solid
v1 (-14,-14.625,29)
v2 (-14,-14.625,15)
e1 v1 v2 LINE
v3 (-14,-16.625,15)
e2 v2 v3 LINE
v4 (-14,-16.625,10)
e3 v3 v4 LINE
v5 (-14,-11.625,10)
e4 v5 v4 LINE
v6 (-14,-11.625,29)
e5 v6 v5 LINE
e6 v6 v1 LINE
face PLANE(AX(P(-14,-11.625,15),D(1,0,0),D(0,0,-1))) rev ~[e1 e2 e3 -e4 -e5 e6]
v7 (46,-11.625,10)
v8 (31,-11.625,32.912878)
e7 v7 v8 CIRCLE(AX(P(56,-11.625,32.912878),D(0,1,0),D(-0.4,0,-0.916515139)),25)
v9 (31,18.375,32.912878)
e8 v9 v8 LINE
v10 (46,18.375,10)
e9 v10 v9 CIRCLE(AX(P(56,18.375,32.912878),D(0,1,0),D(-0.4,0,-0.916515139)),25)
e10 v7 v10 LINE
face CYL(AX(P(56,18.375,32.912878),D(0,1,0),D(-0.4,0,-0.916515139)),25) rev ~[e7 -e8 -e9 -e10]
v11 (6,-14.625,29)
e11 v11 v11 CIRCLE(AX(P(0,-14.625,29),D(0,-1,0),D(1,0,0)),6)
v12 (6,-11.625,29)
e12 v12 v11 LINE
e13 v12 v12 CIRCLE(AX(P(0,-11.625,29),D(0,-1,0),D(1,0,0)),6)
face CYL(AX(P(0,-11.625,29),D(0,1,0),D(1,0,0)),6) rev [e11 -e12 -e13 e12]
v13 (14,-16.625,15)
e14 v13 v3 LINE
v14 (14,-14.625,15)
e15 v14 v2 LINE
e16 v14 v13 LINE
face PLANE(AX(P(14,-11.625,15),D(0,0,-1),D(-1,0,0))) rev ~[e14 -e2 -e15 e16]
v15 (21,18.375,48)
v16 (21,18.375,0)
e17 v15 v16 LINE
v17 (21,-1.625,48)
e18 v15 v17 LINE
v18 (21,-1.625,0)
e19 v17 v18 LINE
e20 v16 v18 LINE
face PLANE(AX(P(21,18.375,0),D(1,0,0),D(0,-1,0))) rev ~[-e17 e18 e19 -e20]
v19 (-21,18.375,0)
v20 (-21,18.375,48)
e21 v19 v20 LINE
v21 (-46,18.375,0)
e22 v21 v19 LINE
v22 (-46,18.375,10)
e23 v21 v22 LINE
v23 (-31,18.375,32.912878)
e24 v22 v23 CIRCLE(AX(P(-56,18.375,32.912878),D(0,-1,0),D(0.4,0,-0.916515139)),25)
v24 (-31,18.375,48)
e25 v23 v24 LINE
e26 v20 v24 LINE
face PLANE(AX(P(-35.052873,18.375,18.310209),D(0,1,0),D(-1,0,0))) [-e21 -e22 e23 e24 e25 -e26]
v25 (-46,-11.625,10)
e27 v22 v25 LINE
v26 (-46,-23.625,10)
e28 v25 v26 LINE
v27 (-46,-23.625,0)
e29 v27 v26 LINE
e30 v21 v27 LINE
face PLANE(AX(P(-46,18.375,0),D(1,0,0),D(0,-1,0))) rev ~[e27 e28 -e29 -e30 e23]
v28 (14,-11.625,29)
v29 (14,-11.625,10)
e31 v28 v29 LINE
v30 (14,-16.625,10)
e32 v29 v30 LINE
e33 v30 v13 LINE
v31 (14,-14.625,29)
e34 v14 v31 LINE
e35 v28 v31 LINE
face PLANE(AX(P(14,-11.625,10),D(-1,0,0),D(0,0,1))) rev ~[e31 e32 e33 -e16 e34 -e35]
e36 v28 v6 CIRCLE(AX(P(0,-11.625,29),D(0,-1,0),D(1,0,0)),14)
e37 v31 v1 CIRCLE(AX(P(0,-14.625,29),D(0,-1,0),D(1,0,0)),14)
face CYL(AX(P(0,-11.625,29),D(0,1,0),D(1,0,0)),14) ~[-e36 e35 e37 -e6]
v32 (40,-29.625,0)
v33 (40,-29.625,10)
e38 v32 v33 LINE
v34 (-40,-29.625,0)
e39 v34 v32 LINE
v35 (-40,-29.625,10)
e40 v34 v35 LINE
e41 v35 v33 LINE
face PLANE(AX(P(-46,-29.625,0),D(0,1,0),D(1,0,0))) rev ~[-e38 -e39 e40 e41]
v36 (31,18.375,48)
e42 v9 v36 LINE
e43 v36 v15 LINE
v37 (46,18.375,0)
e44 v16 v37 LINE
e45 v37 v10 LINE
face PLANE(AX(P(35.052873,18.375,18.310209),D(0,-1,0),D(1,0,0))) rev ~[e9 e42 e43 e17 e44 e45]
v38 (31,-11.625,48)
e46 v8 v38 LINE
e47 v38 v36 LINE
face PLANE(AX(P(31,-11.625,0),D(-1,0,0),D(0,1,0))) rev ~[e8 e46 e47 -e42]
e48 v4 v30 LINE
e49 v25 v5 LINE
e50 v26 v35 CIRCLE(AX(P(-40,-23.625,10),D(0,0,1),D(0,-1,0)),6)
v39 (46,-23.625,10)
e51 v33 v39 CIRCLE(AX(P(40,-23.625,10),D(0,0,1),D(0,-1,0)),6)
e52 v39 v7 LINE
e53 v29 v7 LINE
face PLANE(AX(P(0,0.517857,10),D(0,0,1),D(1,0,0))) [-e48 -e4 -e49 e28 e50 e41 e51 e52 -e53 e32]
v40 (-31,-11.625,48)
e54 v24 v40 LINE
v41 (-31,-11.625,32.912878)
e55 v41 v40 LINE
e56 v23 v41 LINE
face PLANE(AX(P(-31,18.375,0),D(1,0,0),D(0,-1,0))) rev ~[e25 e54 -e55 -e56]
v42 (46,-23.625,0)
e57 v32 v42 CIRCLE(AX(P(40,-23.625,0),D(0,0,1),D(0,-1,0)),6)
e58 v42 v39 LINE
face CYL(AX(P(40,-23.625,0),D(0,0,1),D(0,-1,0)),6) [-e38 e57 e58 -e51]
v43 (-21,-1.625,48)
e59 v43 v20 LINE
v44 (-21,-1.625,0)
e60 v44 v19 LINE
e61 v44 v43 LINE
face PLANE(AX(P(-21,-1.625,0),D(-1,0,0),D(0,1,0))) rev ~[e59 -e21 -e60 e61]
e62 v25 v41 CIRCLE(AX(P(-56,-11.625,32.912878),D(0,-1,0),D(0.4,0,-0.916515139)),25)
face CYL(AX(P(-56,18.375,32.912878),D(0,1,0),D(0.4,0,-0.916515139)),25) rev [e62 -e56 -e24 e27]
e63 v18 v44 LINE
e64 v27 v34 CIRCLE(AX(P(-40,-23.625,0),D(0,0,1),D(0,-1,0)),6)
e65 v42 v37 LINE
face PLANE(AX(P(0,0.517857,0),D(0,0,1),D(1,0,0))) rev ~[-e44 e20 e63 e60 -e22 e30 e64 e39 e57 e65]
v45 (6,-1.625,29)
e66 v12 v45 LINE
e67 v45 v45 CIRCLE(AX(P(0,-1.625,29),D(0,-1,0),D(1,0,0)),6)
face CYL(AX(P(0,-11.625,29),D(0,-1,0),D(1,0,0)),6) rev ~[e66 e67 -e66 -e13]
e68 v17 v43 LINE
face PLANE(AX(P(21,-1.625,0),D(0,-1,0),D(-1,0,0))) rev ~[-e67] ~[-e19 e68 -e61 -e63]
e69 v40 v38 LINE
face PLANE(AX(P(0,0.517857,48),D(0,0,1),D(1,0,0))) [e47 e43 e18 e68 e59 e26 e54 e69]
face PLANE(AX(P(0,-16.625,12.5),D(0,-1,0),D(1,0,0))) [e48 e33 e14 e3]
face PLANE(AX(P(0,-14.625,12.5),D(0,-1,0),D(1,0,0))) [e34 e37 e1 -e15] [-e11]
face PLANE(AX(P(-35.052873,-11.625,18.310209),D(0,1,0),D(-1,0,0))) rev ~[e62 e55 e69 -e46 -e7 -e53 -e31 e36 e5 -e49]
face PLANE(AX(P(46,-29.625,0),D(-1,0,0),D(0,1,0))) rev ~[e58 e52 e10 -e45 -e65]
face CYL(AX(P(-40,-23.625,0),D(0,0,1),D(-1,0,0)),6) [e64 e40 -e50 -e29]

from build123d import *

# Parameters (mm, degrees)
F1_DEPTH    = 48
F2_DEPTH    = 10
F3_R        = 6
F4_T1_DEPTH = 30
F5_T1_DEPTH = 30
F7_DEPTH    = 5
F6_R        = 6
F8_DEPTH    = 3
F9_DEPTH    = 25


# Not quite as in the source:
# - a fillet or chamfer that OpenCascade refuses, or shapes differently, is made with other operations: its cross-section is extruded or revolved along the edge and cut away or added


with BuildPart() as f1:
    # F0 (on Top) → F1 (new body)
    with BuildSketch(Plane.XY):
        Polygon((21, -1.625), (0, -1.625), (-21, -1.625), (-21, 18.375), (-31, 18.375), (-31, -11.625), (0, -11.625), (31, -11.625), (31, 18.375), (21, 18.375), align=None)
    extrude(amount=F1_DEPTH)

    # F0 (on Top) → F2 (join)
    with BuildSketch(Plane.XY):
        Polygon((21, -1.625), (0, -1.625), (-21, -1.625), (-21, 18.375), (-31, 18.375), (-31, -11.625), (0, -11.625), (31, -11.625), (31, 18.375), (21, 18.375), align=None)
        Polygon((-31, -11.625), (-31, 18.375), (-46, 18.375), (-46, -29.625), (0, -29.625), (46, -29.625), (46, 18.375), (31, 18.375), (31, -11.625), (0, -11.625), align=None)
    extrude(amount=F2_DEPTH)

    # F3
    f3_edges = [f1.edges().sort_by_distance(p)[0] for p in [
        (-46, -29.625, 5),
        (46, -29.625, 5),
    ]]
    fillet(f3_edges, radius=F3_R)

    # F4: fillet of radius 25 on 1 edges, made by hand

    # F4_s2 → F4_t1 (join)
    with BuildSketch(Plane.XZ.offset(-18.375)):
        with BuildLine():
            ThreePointArc((46, 10), (35.0834993366, 19.2198145372), (31, 32.9128784748))
            Line((31, 32.9128784748), (31, 10))
            Line((31, 10), (46, 10))
        make_face()
    extrude(amount=F4_T1_DEPTH)

    # F5: fillet of radius 25 on 1 edges, made by hand

    # F5_s2 → F5_t1 (join)
    with BuildSketch(Plane.XZ.offset(-18.375)):
        with BuildLine():
            ThreePointArc((-46, 10), (-35.0834993366, 19.2198145372), (-31, 32.9128784748))
            Line((-31, 32.9128784748), (-31, 10))
            Line((-31, 10), (-46, 10))
        make_face()
    extrude(amount=F5_T1_DEPTH)

    # F6 (on face) → F7 (join)
    with BuildSketch(Plane.XZ.offset(11.625)):
        Polygon((-14, 15), (-14, 10), (14, 10), (14, 15), (0, 15), align=None)
    extrude(amount=F7_DEPTH)

    # F6 (on face) → F8 (join)
    with BuildSketch(Plane.XZ.offset(11.625)):
        Polygon((-14, 15), (-14, 10), (14, 10), (14, 15), (0, 15), align=None)
        with BuildLine():
            Line((-14, 29), (-14, 15))
            Line((-14, 15), (0, 15))
            Line((0, 15), (14, 15))
            Line((14, 15), (14, 29))
            ThreePointArc((14, 29), (0, 43), (-14, 29))
        make_face()
        with Locations((0, 29)):
            Circle(F6_R, mode=Mode.SUBTRACT)
    extrude(amount=F8_DEPTH)

    # F9 (cut): a face of the model
    f9_faces = [f1.faces().sort_by_distance(p)[0] for p in [
        (0, -11.625, 29),
    ]]
    extrude(f9_faces, amount=-F9_DEPTH, mode=Mode.SUBTRACT)


solid = f1.part
